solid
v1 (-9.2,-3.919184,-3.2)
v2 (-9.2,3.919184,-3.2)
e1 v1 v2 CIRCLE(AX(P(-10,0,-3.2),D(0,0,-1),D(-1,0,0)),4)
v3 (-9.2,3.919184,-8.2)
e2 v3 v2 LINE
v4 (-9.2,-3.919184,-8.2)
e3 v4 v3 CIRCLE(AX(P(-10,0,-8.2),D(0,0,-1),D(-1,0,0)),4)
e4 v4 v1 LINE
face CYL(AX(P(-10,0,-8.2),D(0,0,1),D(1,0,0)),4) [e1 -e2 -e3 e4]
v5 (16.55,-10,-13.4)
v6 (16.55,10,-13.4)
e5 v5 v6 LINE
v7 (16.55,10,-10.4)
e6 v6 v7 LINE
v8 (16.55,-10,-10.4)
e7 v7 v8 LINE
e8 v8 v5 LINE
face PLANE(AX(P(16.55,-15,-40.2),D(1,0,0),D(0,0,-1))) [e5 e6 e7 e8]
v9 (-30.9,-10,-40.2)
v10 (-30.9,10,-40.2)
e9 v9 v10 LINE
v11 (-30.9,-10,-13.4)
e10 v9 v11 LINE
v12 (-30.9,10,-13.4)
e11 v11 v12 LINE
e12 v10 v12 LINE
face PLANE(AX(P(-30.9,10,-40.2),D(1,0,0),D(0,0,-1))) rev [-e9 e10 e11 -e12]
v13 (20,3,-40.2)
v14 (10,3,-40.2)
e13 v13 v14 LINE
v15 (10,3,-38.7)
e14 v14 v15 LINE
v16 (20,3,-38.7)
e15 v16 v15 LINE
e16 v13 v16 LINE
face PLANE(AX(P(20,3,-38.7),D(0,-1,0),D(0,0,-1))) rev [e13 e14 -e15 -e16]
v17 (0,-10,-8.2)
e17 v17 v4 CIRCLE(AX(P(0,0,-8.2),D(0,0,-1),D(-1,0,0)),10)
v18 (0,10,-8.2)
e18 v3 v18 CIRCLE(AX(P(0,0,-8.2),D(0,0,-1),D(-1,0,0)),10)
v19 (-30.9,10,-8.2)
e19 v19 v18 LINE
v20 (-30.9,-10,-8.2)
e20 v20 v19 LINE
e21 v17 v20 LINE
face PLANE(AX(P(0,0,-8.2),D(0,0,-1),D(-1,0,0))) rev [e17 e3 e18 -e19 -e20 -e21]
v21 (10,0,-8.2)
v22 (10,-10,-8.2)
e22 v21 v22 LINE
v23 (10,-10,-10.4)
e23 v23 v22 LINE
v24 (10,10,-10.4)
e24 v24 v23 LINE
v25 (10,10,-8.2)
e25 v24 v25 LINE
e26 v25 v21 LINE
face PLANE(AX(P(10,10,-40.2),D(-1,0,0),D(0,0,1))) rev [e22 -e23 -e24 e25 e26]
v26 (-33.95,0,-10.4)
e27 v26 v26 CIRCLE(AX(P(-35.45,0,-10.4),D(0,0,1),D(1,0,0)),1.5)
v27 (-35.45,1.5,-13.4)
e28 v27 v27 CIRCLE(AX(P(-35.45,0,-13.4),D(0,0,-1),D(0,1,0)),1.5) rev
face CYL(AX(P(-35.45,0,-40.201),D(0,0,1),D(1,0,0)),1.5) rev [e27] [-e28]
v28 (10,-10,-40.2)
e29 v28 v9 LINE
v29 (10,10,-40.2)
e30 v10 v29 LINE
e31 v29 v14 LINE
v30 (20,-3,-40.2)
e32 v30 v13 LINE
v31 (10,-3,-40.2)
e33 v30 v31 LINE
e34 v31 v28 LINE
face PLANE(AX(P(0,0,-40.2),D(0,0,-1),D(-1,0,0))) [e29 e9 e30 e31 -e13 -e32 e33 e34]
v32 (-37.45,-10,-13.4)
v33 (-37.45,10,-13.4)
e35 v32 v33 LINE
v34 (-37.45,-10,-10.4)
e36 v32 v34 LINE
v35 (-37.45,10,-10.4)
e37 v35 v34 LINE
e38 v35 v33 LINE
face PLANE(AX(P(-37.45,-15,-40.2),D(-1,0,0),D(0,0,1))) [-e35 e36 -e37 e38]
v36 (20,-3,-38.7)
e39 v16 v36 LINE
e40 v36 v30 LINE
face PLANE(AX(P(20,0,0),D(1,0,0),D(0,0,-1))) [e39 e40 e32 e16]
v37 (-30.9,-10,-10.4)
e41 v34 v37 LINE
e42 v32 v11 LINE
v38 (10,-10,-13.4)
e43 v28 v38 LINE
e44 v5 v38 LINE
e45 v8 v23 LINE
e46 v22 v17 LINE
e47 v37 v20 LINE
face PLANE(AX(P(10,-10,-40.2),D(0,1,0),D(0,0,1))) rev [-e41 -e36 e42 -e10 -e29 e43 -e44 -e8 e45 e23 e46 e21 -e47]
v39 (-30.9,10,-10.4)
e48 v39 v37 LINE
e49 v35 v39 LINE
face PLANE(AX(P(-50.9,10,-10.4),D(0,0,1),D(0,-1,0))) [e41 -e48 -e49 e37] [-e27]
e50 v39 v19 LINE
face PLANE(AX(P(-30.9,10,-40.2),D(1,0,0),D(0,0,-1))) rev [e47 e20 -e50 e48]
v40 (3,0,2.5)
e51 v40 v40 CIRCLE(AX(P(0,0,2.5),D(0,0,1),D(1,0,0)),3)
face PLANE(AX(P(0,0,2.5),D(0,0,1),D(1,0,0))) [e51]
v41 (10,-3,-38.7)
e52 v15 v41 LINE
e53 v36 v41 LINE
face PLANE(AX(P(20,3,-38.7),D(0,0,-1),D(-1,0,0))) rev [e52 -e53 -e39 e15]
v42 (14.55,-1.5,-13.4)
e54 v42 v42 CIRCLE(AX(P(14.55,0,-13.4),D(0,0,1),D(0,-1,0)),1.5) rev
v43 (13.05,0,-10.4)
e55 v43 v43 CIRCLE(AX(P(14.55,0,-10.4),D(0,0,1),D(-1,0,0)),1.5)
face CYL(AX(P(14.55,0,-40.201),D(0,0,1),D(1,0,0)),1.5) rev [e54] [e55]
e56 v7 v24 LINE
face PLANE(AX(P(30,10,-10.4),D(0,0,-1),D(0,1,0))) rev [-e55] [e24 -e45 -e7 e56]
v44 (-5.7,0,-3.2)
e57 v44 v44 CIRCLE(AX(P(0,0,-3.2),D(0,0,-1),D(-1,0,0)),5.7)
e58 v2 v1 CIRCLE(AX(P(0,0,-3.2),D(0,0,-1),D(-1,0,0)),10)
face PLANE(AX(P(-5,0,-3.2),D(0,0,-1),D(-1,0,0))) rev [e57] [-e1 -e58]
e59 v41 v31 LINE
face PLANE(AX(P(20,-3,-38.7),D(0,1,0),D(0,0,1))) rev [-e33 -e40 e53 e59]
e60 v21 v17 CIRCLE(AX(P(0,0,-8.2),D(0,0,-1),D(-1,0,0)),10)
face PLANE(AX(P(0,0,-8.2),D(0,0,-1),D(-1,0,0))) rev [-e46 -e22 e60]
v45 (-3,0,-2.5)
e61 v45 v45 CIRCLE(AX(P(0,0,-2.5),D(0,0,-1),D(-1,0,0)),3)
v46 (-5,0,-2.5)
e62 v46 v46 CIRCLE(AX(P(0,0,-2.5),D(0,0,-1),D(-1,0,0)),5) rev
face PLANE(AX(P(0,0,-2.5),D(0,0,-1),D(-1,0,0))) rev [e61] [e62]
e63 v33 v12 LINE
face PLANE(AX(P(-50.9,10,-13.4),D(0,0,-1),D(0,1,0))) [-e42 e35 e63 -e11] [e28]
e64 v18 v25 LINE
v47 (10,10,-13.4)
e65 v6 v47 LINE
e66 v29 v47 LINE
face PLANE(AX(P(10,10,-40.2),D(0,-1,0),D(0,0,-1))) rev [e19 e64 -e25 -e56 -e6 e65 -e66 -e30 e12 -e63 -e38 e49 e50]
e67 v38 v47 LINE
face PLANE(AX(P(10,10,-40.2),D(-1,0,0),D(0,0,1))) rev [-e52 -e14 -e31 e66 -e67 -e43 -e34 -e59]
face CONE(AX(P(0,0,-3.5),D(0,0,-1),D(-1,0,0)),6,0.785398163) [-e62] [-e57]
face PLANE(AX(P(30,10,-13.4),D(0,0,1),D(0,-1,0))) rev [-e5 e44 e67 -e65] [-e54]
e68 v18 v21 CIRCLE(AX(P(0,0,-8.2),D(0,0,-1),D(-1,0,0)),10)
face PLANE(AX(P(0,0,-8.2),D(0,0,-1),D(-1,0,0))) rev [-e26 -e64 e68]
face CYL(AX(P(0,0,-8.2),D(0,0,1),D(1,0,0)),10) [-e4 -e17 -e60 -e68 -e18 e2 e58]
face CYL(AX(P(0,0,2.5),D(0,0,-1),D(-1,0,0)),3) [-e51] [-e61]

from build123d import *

# Parameters (mm, degrees)
SKETCH3_R           = 3
BOSS_EXTRUDE1_DEPTH = 2.5
SKETCH4_R           = 6
BOSS_EXTRUDE2_DEPTH = 0.7
BOSS_EXTRUDE3_DEPTH = 5
SKETCH6_W           = 40.9
SKETCH6_H           = 20
BOSS_EXTRUDE4_DEPTH = 32
SKETCH7_W           = 3
SKETCH7_H           = 20
BOSS_EXTRUDE5_DEPTH = 20
SKETCH8_OUTSIDE_W   = 101.628
SKETCH8_OUTSIDE_H   = 40.728
SKETCH8_OUTSIDE_W_2 = 54
SKETCH8_OUTSIDE_H_2 = 30
CUT_EXTRUDE1_DEPTH  = 66.626595219
CUT_EXTRUDE2_REACH  = 50.893
SKETCH10_R          = 1.5
SKETCH11_W          = 1.5
SKETCH11_H          = 6
BOSS_EXTRUDE6_DEPTH = 10
CHAMFER1_SIZE       = 1


with BuildPart() as part:
    # Sketch3 → Boss-Extrude1 (new, symmetric)
    with BuildSketch(Plane.XY):
        Circle(SKETCH3_R)
    extrude(amount=BOSS_EXTRUDE1_DEPTH, both=True)

    # Sketch4 → Boss-Extrude2 (add)
    with BuildSketch(Plane(origin=(0, 0, -2.5), x_dir=(-1, 0, 0), z_dir=(0, 0, -1))):
        Circle(SKETCH4_R)
    extrude(amount=BOSS_EXTRUDE2_DEPTH)

    # Sketch5 → Boss-Extrude3 (add)
    with BuildSketch(Plane(origin=(0, 0, -3.2), x_dir=(-1, 0, 0), z_dir=(0, 0, -1))):
        with BuildLine():
            ThreePointArc((9.2, 3.919183588), (-10, 0), (9.2, -3.919183588))
            ThreePointArc((9.2, -3.919183588), (14, 0), (9.2, 3.919183588))
        make_face()
    extrude(amount=BOSS_EXTRUDE3_DEPTH)

    # Sketch6 → Boss-Extrude4 (add)
    with BuildSketch(Plane(origin=(0, 0, -8.2), x_dir=(-1, 0, 0), z_dir=(0, 0, -1))):
        with Locations((10.45, 0)):
            Rectangle(SKETCH6_W, SKETCH6_H)
    extrude(amount=BOSS_EXTRUDE4_DEPTH)

    # Sketch7 → Boss-Extrude5 (add)
    with BuildSketch(Plane(origin=(10, 0, 0), x_dir=(0, 0, -1), z_dir=(1, 0, 0))):
        with Locations((11.9, 0)):
            Rectangle(SKETCH7_W, SKETCH7_H)
    boss_extrude5 = extrude(amount=BOSS_EXTRUDE5_DEPTH)

    # Mirror1: Boss-Extrude5 across plane
    add(boss_extrude5.mirror(Plane(origin=(-10.45, 0, 0), x_dir=(0, 0, 1), z_dir=(1, 0, 0))))

    # Sketch8 outside → Cut-Extrude1 (cut, through all)
    with BuildSketch(Plane.XY):
        with Locations((-10.45, 0)):
            Rectangle(SKETCH8_OUTSIDE_W, SKETCH8_OUTSIDE_H)
        with Locations((-10.45, 0)):
            Rectangle(SKETCH8_OUTSIDE_W_2, SKETCH8_OUTSIDE_H_2, mode=Mode.SUBTRACT)
    extrude(amount=-CUT_EXTRUDE1_DEPTH, mode=Mode.SUBTRACT)

    # Sketch10 → Cut-Extrude2 (cut, up to next)
    with BuildSketch(Plane.XY.offset(-10.4), mode=Mode.PRIVATE) as cut_extrude2_sk1:
        with Locations((-35.45, 0)):
            Circle(SKETCH10_R)
    cut_extrude2_tool1 = extrude(cut_extrude2_sk1.sketch, amount=-CUT_EXTRUDE2_REACH, mode=Mode.PRIVATE) & part.part
    # Sketch10 → Cut-Extrude2 (cut, up to next)
    with BuildSketch(Plane.XY.offset(-10.4), mode=Mode.PRIVATE) as cut_extrude2_sk2:
        with Locations(Location((14.55, 0, 0), (0, 0, 270))):
            Circle(SKETCH10_R)
    cut_extrude2_tool2 = extrude(cut_extrude2_sk2.sketch, amount=-CUT_EXTRUDE2_REACH, mode=Mode.PRIVATE) & part.part
    add(cut_extrude2_tool1.solids().sort_by_distance((-35.45, 0, -10.4))[0], mode=Mode.SUBTRACT)
    add(cut_extrude2_tool2.solids().sort_by_distance((14.55, 0, -10.4))[0], mode=Mode.SUBTRACT)

    # Sketch11 → Boss-Extrude6 (add)
    with BuildSketch(Plane(origin=(10, 0, 0), x_dir=(0, 0, -1), z_dir=(1, 0, 0))):
        with Locations((39.45, 0)):
            Rectangle(SKETCH11_W, SKETCH11_H)
    extrude(amount=BOSS_EXTRUDE6_DEPTH)

    # Chamfer1
    # the kernel refuses this chamfer: 1 mm, written as the material it takes off along each edge
    with BuildSketch(Plane(origin=(0, 0, -2.5), x_dir=(-1, 0, 0), z_dir=(0, -1, 0))) as chamfer1_piece_1_section:
        Polygon((6, CHAMFER1_SIZE), (6 - CHAMFER1_SIZE, 0), (6, 0), align=None)
    chamfer1_piece_1 = revolve(axis=Axis((0, 0, -2.5), (0, 0, -1)), mode=Mode.PRIVATE)
    chamfer1_piece_1 = split(chamfer1_piece_1, bisect_by=Plane(origin=(5.354214233, 0, -3.2), z_dir=(0, 0, 1)), keep=Keep.TOP, mode=Mode.PRIVATE)
    add(chamfer1_piece_1, mode=Mode.SUBTRACT)


solid = part.part
